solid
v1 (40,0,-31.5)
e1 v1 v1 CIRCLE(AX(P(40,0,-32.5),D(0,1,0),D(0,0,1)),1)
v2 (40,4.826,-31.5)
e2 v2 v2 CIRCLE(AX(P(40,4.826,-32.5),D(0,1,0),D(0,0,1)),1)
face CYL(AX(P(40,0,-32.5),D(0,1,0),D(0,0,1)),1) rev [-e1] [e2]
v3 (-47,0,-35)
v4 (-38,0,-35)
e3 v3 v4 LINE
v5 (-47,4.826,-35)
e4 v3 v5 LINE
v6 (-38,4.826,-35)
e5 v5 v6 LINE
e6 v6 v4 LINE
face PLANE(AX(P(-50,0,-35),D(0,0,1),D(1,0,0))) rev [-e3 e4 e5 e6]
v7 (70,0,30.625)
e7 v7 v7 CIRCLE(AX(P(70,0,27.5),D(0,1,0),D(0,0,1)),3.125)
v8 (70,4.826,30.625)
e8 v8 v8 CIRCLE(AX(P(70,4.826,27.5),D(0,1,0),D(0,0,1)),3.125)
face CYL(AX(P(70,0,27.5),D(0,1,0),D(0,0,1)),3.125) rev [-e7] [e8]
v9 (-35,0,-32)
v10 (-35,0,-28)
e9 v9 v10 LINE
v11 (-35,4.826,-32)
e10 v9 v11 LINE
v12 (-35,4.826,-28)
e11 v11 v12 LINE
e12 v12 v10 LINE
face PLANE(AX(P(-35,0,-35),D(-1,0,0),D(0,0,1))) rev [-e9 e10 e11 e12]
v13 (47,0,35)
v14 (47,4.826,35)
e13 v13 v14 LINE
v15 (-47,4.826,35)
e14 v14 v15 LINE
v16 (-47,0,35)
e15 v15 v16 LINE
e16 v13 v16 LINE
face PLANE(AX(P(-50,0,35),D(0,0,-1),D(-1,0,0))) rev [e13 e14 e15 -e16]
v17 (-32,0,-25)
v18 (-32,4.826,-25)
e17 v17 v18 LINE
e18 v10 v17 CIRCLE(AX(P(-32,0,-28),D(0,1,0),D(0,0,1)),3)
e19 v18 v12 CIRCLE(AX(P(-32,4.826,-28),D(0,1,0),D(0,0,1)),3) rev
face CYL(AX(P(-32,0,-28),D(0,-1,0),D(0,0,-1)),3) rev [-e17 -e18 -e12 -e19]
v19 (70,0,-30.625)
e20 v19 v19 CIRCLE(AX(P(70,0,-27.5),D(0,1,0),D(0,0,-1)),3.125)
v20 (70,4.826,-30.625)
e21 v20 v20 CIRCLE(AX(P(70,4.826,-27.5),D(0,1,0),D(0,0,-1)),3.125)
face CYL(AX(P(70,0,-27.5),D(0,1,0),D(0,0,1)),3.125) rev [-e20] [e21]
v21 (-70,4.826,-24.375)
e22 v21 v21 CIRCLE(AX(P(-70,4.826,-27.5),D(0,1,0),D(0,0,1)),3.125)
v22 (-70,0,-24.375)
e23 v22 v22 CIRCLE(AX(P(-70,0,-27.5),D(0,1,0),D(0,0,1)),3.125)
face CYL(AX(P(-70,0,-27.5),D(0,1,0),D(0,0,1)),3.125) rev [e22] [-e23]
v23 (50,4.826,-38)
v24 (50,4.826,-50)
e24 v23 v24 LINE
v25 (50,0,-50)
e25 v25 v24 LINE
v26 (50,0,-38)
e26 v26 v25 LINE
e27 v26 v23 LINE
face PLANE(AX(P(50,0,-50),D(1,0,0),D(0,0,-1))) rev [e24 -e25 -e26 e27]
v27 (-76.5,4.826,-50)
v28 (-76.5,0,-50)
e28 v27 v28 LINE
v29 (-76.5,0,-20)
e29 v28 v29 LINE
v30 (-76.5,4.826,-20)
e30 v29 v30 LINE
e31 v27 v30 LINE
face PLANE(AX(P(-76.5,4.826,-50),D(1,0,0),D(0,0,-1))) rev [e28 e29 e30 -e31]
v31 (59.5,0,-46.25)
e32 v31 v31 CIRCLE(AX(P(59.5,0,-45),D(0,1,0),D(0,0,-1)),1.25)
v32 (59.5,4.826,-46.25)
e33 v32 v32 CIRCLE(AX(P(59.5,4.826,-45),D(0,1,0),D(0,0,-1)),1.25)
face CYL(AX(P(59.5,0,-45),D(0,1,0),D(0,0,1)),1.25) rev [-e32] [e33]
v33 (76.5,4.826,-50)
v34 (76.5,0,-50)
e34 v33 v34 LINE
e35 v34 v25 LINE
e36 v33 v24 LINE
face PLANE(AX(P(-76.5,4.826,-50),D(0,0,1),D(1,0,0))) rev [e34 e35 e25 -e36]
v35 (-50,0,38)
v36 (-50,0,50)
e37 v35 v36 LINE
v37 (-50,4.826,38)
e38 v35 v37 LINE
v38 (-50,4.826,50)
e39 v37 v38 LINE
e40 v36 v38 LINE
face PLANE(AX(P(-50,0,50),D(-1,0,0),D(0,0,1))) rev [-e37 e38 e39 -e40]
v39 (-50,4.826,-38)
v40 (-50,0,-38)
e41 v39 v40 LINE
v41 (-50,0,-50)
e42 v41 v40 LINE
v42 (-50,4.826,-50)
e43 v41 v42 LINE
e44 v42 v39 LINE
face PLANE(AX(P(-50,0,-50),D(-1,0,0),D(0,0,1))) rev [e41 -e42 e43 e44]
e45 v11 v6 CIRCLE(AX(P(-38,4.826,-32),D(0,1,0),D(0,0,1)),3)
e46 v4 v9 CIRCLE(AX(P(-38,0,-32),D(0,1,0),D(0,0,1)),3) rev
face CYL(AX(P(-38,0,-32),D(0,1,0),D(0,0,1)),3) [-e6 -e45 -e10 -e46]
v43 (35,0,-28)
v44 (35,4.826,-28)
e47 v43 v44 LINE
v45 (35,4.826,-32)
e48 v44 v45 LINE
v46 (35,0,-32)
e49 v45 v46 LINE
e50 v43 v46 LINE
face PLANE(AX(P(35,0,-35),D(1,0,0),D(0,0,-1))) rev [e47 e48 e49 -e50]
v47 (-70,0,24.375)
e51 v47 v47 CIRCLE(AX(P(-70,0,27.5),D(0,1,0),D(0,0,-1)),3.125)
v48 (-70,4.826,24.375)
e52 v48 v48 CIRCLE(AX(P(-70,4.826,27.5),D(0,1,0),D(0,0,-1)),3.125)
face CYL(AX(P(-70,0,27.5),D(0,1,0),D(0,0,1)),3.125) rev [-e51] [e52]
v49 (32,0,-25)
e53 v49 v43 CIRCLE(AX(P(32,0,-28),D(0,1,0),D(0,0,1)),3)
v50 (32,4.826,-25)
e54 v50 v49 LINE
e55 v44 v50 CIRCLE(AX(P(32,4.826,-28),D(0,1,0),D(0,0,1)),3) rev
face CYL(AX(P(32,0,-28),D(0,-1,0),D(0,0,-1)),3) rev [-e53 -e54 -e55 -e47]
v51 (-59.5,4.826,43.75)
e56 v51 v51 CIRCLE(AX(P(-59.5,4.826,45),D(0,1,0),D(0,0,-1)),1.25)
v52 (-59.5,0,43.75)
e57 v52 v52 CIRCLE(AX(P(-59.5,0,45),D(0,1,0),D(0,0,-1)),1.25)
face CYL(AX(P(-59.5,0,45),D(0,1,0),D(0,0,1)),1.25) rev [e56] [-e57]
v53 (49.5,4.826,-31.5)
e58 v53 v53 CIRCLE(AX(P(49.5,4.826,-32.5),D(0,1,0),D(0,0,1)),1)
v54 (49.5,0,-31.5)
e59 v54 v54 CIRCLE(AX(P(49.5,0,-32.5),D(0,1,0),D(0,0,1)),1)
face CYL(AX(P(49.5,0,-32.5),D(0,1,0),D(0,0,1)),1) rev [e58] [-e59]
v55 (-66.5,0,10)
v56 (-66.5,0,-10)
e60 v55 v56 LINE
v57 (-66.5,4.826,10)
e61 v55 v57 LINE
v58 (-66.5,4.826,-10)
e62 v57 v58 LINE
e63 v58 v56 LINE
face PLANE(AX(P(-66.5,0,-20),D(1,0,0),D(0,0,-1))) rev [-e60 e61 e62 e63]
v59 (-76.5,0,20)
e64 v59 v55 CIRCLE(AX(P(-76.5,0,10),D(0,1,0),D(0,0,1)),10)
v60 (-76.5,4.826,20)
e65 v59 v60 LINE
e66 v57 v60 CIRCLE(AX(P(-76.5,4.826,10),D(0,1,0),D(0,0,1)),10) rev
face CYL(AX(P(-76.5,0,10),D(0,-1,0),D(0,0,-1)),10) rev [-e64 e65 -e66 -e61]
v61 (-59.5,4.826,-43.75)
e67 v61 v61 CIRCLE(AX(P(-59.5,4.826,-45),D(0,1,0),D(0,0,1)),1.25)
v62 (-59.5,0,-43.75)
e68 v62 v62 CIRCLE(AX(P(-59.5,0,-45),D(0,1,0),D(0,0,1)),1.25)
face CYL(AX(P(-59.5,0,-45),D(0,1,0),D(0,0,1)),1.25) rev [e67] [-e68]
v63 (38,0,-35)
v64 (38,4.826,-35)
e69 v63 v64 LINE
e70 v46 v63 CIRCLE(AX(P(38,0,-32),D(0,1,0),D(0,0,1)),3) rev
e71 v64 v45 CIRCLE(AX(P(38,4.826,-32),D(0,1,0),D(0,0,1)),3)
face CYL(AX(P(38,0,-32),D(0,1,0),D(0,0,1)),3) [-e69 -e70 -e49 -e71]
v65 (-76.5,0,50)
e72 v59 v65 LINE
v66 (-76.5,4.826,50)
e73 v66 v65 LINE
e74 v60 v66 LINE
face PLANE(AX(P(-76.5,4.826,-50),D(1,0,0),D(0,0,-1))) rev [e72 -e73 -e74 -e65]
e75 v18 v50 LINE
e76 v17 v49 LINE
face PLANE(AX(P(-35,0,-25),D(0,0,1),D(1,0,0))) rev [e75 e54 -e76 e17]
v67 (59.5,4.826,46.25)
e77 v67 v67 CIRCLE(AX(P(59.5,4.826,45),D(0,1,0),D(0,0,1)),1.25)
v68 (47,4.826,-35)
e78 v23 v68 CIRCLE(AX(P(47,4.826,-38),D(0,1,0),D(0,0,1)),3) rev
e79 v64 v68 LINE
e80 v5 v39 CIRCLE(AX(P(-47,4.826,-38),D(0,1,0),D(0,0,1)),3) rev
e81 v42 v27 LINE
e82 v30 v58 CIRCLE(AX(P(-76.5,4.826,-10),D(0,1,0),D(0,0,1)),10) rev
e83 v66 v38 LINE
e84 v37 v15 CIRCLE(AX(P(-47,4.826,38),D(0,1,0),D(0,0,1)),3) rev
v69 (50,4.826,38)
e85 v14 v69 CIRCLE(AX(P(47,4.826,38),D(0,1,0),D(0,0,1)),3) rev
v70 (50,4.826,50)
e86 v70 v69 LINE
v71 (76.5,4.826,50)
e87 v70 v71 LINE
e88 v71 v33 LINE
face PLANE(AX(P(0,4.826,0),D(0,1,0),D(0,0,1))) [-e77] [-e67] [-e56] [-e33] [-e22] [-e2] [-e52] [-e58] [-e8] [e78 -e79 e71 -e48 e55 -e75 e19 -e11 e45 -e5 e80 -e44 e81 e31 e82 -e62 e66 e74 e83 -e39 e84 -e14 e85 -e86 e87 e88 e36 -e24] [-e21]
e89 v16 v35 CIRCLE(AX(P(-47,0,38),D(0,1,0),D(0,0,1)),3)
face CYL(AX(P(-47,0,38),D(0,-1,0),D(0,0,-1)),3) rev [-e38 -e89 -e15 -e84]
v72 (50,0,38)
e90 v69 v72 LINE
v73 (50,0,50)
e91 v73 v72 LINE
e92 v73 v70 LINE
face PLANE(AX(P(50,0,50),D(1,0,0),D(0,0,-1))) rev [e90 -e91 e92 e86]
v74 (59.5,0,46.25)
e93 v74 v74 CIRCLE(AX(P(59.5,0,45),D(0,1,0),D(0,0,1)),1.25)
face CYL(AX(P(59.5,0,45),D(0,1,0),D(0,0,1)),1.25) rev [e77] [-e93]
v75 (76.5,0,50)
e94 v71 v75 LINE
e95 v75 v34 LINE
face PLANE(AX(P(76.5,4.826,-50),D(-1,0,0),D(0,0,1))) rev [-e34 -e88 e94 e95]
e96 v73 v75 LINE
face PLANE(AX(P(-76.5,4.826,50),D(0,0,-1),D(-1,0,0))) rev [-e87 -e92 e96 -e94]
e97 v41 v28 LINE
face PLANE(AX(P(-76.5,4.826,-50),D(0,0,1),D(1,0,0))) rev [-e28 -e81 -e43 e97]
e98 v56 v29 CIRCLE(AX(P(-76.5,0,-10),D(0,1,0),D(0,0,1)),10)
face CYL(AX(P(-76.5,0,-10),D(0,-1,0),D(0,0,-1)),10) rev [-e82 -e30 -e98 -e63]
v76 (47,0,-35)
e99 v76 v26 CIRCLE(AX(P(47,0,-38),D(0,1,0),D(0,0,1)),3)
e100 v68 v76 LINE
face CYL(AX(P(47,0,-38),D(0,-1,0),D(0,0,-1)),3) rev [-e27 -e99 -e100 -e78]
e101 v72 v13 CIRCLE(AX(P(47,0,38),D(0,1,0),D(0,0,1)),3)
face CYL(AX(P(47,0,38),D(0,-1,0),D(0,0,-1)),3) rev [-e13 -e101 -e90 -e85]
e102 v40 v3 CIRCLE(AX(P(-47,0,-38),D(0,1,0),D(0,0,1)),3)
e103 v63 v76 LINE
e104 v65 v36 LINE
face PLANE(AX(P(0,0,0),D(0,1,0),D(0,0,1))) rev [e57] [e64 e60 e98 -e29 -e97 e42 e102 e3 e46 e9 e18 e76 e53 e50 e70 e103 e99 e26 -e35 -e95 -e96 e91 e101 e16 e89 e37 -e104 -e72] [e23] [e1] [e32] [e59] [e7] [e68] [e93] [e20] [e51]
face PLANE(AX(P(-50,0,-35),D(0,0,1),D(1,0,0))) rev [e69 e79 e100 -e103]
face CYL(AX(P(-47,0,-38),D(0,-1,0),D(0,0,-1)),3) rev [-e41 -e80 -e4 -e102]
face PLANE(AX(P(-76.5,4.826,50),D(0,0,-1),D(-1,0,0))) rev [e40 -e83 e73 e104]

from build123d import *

# Parameters (mm, degrees)
SKETCH1_W           = 153
SKETCH1_H           = 100
BOSS_EXTRUDE1_DEPTH = 4.826
SKETCH2_W           = 100
SKETCH2_H           = 15
CUT_EXTRUDE1_DEPTH  = 92.517977884
SKETCH3_R           = 3.125
SKETCH3_R_2         = 1.25
CUT_EXTRUDE2_DEPTH  = 92.517977884
SKETCH5_W           = 10
SKETCH5_H           = 40
CUT_EXTRUDE3_DEPTH  = 92.517977884
SKETCH6_R           = 1
SKETCH6_W           = 70
SKETCH6_H           = 10
CUT_EXTRUDE4_DEPTH  = 92.517977884
FILLET1_R           = 3
FILLET2_R           = 10


with BuildPart() as part:
    # Sketch1 → Boss-Extrude1 (new body)
    with BuildSketch(Plane(origin=(0, 0, 0), x_dir=(1, 0, 0), z_dir=(0, 1, 0))):
        Rectangle(SKETCH1_W, SKETCH1_H)
    extrude(amount=BOSS_EXTRUDE1_DEPTH)

    # Sketch2 → Cut-Extrude1 (cut, through all)
    with BuildSketch(Plane(origin=(0, 4.826, 0), x_dir=(1, 0, 0), z_dir=(0, 1, 0))):
        with Locations((0, 42.5)):
            Rectangle(SKETCH2_W, SKETCH2_H)
        with Locations((0, -42.5)):
            Rectangle(SKETCH2_W, SKETCH2_H)
    extrude(amount=-CUT_EXTRUDE1_DEPTH, mode=Mode.SUBTRACT)

    # Sketch3 → Cut-Extrude2 (cut, through all)
    with BuildSketch(Plane(origin=(0, 4.826, 0), x_dir=(1, 0, 0), z_dir=(0, 1, 0))):
        with Locations(Location((-70, 27.5, 0), (0, 0, 270))):
            Circle(SKETCH3_R)
        with Locations(Location((-70, -27.5, 0), (0, 0, 90))):
            Circle(SKETCH3_R)
        with Locations(Location((70, -27.5, 0), (0, 0, 270))):
            Circle(SKETCH3_R)
        with Locations(Location((70, 27.5, 0), (0, 0, 90))):
            Circle(SKETCH3_R)
        with Locations(Location((-59.5, 45, 0), (0, 0, 270))):
            Circle(SKETCH3_R_2)
        with Locations(Location((-59.5, -45, 0), (0, 0, 90))):
            Circle(SKETCH3_R_2)
        with Locations(Location((59.5, 45, 0), (0, 0, 90))):
            Circle(SKETCH3_R_2)
        with Locations(Location((59.5, -45, 0), (0, 0, 270))):
            Circle(SKETCH3_R_2)
    extrude(amount=-CUT_EXTRUDE2_DEPTH, mode=Mode.SUBTRACT)

    # Sketch5 → Cut-Extrude3 (cut, through all)
    with BuildSketch(Plane(origin=(0, 4.826, 0), x_dir=(1, 0, 0), z_dir=(0, 1, 0))):
        with Locations((-71.5, 0)):
            Rectangle(SKETCH5_W, SKETCH5_H)
    extrude(amount=-CUT_EXTRUDE3_DEPTH, mode=Mode.SUBTRACT)

    # Sketch6 → Cut-Extrude4 (cut, through all)
    with BuildSketch(Plane(origin=(0, 4.826, 0), x_dir=(1, 0, 0), z_dir=(0, 1, 0))):
        with Locations(Location((40, 32.5, 0), (0, 0, 270))):
            Circle(SKETCH6_R)
        with Locations(Location((49.5, 32.5, 0), (0, 0, 270))):
            Circle(SKETCH6_R)
        with Locations((0, 30)):
            Rectangle(SKETCH6_W, SKETCH6_H)
    extrude(amount=-CUT_EXTRUDE4_DEPTH, mode=Mode.SUBTRACT)

    # Fillet1
    fillet1_edges = [part.edges().sort_by_distance(p)[0] for p in [
        (-35, 2.413, -25),
        (-35, 2.413, -35),
        (35, 2.413, -35),
        (35, 2.413, -25),
        (-50, 2.413, -35),
        (50, 2.413, -35),
        (-50, 2.413, 35),
        (50, 2.413, 35),
    ]]
    fillet(fillet1_edges, radius=FILLET1_R)

    # Fillet2
    fillet2_edges = [part.edges().sort_by_distance(p)[0] for p in [
        (-66.5, 2.413, 20),
        (-66.5, 2.413, -20),
    ]]
    fillet(fillet2_edges, radius=FILLET2_R - 0.0001)  # a hair under: the kernel refuses the full size


solid = part.part
